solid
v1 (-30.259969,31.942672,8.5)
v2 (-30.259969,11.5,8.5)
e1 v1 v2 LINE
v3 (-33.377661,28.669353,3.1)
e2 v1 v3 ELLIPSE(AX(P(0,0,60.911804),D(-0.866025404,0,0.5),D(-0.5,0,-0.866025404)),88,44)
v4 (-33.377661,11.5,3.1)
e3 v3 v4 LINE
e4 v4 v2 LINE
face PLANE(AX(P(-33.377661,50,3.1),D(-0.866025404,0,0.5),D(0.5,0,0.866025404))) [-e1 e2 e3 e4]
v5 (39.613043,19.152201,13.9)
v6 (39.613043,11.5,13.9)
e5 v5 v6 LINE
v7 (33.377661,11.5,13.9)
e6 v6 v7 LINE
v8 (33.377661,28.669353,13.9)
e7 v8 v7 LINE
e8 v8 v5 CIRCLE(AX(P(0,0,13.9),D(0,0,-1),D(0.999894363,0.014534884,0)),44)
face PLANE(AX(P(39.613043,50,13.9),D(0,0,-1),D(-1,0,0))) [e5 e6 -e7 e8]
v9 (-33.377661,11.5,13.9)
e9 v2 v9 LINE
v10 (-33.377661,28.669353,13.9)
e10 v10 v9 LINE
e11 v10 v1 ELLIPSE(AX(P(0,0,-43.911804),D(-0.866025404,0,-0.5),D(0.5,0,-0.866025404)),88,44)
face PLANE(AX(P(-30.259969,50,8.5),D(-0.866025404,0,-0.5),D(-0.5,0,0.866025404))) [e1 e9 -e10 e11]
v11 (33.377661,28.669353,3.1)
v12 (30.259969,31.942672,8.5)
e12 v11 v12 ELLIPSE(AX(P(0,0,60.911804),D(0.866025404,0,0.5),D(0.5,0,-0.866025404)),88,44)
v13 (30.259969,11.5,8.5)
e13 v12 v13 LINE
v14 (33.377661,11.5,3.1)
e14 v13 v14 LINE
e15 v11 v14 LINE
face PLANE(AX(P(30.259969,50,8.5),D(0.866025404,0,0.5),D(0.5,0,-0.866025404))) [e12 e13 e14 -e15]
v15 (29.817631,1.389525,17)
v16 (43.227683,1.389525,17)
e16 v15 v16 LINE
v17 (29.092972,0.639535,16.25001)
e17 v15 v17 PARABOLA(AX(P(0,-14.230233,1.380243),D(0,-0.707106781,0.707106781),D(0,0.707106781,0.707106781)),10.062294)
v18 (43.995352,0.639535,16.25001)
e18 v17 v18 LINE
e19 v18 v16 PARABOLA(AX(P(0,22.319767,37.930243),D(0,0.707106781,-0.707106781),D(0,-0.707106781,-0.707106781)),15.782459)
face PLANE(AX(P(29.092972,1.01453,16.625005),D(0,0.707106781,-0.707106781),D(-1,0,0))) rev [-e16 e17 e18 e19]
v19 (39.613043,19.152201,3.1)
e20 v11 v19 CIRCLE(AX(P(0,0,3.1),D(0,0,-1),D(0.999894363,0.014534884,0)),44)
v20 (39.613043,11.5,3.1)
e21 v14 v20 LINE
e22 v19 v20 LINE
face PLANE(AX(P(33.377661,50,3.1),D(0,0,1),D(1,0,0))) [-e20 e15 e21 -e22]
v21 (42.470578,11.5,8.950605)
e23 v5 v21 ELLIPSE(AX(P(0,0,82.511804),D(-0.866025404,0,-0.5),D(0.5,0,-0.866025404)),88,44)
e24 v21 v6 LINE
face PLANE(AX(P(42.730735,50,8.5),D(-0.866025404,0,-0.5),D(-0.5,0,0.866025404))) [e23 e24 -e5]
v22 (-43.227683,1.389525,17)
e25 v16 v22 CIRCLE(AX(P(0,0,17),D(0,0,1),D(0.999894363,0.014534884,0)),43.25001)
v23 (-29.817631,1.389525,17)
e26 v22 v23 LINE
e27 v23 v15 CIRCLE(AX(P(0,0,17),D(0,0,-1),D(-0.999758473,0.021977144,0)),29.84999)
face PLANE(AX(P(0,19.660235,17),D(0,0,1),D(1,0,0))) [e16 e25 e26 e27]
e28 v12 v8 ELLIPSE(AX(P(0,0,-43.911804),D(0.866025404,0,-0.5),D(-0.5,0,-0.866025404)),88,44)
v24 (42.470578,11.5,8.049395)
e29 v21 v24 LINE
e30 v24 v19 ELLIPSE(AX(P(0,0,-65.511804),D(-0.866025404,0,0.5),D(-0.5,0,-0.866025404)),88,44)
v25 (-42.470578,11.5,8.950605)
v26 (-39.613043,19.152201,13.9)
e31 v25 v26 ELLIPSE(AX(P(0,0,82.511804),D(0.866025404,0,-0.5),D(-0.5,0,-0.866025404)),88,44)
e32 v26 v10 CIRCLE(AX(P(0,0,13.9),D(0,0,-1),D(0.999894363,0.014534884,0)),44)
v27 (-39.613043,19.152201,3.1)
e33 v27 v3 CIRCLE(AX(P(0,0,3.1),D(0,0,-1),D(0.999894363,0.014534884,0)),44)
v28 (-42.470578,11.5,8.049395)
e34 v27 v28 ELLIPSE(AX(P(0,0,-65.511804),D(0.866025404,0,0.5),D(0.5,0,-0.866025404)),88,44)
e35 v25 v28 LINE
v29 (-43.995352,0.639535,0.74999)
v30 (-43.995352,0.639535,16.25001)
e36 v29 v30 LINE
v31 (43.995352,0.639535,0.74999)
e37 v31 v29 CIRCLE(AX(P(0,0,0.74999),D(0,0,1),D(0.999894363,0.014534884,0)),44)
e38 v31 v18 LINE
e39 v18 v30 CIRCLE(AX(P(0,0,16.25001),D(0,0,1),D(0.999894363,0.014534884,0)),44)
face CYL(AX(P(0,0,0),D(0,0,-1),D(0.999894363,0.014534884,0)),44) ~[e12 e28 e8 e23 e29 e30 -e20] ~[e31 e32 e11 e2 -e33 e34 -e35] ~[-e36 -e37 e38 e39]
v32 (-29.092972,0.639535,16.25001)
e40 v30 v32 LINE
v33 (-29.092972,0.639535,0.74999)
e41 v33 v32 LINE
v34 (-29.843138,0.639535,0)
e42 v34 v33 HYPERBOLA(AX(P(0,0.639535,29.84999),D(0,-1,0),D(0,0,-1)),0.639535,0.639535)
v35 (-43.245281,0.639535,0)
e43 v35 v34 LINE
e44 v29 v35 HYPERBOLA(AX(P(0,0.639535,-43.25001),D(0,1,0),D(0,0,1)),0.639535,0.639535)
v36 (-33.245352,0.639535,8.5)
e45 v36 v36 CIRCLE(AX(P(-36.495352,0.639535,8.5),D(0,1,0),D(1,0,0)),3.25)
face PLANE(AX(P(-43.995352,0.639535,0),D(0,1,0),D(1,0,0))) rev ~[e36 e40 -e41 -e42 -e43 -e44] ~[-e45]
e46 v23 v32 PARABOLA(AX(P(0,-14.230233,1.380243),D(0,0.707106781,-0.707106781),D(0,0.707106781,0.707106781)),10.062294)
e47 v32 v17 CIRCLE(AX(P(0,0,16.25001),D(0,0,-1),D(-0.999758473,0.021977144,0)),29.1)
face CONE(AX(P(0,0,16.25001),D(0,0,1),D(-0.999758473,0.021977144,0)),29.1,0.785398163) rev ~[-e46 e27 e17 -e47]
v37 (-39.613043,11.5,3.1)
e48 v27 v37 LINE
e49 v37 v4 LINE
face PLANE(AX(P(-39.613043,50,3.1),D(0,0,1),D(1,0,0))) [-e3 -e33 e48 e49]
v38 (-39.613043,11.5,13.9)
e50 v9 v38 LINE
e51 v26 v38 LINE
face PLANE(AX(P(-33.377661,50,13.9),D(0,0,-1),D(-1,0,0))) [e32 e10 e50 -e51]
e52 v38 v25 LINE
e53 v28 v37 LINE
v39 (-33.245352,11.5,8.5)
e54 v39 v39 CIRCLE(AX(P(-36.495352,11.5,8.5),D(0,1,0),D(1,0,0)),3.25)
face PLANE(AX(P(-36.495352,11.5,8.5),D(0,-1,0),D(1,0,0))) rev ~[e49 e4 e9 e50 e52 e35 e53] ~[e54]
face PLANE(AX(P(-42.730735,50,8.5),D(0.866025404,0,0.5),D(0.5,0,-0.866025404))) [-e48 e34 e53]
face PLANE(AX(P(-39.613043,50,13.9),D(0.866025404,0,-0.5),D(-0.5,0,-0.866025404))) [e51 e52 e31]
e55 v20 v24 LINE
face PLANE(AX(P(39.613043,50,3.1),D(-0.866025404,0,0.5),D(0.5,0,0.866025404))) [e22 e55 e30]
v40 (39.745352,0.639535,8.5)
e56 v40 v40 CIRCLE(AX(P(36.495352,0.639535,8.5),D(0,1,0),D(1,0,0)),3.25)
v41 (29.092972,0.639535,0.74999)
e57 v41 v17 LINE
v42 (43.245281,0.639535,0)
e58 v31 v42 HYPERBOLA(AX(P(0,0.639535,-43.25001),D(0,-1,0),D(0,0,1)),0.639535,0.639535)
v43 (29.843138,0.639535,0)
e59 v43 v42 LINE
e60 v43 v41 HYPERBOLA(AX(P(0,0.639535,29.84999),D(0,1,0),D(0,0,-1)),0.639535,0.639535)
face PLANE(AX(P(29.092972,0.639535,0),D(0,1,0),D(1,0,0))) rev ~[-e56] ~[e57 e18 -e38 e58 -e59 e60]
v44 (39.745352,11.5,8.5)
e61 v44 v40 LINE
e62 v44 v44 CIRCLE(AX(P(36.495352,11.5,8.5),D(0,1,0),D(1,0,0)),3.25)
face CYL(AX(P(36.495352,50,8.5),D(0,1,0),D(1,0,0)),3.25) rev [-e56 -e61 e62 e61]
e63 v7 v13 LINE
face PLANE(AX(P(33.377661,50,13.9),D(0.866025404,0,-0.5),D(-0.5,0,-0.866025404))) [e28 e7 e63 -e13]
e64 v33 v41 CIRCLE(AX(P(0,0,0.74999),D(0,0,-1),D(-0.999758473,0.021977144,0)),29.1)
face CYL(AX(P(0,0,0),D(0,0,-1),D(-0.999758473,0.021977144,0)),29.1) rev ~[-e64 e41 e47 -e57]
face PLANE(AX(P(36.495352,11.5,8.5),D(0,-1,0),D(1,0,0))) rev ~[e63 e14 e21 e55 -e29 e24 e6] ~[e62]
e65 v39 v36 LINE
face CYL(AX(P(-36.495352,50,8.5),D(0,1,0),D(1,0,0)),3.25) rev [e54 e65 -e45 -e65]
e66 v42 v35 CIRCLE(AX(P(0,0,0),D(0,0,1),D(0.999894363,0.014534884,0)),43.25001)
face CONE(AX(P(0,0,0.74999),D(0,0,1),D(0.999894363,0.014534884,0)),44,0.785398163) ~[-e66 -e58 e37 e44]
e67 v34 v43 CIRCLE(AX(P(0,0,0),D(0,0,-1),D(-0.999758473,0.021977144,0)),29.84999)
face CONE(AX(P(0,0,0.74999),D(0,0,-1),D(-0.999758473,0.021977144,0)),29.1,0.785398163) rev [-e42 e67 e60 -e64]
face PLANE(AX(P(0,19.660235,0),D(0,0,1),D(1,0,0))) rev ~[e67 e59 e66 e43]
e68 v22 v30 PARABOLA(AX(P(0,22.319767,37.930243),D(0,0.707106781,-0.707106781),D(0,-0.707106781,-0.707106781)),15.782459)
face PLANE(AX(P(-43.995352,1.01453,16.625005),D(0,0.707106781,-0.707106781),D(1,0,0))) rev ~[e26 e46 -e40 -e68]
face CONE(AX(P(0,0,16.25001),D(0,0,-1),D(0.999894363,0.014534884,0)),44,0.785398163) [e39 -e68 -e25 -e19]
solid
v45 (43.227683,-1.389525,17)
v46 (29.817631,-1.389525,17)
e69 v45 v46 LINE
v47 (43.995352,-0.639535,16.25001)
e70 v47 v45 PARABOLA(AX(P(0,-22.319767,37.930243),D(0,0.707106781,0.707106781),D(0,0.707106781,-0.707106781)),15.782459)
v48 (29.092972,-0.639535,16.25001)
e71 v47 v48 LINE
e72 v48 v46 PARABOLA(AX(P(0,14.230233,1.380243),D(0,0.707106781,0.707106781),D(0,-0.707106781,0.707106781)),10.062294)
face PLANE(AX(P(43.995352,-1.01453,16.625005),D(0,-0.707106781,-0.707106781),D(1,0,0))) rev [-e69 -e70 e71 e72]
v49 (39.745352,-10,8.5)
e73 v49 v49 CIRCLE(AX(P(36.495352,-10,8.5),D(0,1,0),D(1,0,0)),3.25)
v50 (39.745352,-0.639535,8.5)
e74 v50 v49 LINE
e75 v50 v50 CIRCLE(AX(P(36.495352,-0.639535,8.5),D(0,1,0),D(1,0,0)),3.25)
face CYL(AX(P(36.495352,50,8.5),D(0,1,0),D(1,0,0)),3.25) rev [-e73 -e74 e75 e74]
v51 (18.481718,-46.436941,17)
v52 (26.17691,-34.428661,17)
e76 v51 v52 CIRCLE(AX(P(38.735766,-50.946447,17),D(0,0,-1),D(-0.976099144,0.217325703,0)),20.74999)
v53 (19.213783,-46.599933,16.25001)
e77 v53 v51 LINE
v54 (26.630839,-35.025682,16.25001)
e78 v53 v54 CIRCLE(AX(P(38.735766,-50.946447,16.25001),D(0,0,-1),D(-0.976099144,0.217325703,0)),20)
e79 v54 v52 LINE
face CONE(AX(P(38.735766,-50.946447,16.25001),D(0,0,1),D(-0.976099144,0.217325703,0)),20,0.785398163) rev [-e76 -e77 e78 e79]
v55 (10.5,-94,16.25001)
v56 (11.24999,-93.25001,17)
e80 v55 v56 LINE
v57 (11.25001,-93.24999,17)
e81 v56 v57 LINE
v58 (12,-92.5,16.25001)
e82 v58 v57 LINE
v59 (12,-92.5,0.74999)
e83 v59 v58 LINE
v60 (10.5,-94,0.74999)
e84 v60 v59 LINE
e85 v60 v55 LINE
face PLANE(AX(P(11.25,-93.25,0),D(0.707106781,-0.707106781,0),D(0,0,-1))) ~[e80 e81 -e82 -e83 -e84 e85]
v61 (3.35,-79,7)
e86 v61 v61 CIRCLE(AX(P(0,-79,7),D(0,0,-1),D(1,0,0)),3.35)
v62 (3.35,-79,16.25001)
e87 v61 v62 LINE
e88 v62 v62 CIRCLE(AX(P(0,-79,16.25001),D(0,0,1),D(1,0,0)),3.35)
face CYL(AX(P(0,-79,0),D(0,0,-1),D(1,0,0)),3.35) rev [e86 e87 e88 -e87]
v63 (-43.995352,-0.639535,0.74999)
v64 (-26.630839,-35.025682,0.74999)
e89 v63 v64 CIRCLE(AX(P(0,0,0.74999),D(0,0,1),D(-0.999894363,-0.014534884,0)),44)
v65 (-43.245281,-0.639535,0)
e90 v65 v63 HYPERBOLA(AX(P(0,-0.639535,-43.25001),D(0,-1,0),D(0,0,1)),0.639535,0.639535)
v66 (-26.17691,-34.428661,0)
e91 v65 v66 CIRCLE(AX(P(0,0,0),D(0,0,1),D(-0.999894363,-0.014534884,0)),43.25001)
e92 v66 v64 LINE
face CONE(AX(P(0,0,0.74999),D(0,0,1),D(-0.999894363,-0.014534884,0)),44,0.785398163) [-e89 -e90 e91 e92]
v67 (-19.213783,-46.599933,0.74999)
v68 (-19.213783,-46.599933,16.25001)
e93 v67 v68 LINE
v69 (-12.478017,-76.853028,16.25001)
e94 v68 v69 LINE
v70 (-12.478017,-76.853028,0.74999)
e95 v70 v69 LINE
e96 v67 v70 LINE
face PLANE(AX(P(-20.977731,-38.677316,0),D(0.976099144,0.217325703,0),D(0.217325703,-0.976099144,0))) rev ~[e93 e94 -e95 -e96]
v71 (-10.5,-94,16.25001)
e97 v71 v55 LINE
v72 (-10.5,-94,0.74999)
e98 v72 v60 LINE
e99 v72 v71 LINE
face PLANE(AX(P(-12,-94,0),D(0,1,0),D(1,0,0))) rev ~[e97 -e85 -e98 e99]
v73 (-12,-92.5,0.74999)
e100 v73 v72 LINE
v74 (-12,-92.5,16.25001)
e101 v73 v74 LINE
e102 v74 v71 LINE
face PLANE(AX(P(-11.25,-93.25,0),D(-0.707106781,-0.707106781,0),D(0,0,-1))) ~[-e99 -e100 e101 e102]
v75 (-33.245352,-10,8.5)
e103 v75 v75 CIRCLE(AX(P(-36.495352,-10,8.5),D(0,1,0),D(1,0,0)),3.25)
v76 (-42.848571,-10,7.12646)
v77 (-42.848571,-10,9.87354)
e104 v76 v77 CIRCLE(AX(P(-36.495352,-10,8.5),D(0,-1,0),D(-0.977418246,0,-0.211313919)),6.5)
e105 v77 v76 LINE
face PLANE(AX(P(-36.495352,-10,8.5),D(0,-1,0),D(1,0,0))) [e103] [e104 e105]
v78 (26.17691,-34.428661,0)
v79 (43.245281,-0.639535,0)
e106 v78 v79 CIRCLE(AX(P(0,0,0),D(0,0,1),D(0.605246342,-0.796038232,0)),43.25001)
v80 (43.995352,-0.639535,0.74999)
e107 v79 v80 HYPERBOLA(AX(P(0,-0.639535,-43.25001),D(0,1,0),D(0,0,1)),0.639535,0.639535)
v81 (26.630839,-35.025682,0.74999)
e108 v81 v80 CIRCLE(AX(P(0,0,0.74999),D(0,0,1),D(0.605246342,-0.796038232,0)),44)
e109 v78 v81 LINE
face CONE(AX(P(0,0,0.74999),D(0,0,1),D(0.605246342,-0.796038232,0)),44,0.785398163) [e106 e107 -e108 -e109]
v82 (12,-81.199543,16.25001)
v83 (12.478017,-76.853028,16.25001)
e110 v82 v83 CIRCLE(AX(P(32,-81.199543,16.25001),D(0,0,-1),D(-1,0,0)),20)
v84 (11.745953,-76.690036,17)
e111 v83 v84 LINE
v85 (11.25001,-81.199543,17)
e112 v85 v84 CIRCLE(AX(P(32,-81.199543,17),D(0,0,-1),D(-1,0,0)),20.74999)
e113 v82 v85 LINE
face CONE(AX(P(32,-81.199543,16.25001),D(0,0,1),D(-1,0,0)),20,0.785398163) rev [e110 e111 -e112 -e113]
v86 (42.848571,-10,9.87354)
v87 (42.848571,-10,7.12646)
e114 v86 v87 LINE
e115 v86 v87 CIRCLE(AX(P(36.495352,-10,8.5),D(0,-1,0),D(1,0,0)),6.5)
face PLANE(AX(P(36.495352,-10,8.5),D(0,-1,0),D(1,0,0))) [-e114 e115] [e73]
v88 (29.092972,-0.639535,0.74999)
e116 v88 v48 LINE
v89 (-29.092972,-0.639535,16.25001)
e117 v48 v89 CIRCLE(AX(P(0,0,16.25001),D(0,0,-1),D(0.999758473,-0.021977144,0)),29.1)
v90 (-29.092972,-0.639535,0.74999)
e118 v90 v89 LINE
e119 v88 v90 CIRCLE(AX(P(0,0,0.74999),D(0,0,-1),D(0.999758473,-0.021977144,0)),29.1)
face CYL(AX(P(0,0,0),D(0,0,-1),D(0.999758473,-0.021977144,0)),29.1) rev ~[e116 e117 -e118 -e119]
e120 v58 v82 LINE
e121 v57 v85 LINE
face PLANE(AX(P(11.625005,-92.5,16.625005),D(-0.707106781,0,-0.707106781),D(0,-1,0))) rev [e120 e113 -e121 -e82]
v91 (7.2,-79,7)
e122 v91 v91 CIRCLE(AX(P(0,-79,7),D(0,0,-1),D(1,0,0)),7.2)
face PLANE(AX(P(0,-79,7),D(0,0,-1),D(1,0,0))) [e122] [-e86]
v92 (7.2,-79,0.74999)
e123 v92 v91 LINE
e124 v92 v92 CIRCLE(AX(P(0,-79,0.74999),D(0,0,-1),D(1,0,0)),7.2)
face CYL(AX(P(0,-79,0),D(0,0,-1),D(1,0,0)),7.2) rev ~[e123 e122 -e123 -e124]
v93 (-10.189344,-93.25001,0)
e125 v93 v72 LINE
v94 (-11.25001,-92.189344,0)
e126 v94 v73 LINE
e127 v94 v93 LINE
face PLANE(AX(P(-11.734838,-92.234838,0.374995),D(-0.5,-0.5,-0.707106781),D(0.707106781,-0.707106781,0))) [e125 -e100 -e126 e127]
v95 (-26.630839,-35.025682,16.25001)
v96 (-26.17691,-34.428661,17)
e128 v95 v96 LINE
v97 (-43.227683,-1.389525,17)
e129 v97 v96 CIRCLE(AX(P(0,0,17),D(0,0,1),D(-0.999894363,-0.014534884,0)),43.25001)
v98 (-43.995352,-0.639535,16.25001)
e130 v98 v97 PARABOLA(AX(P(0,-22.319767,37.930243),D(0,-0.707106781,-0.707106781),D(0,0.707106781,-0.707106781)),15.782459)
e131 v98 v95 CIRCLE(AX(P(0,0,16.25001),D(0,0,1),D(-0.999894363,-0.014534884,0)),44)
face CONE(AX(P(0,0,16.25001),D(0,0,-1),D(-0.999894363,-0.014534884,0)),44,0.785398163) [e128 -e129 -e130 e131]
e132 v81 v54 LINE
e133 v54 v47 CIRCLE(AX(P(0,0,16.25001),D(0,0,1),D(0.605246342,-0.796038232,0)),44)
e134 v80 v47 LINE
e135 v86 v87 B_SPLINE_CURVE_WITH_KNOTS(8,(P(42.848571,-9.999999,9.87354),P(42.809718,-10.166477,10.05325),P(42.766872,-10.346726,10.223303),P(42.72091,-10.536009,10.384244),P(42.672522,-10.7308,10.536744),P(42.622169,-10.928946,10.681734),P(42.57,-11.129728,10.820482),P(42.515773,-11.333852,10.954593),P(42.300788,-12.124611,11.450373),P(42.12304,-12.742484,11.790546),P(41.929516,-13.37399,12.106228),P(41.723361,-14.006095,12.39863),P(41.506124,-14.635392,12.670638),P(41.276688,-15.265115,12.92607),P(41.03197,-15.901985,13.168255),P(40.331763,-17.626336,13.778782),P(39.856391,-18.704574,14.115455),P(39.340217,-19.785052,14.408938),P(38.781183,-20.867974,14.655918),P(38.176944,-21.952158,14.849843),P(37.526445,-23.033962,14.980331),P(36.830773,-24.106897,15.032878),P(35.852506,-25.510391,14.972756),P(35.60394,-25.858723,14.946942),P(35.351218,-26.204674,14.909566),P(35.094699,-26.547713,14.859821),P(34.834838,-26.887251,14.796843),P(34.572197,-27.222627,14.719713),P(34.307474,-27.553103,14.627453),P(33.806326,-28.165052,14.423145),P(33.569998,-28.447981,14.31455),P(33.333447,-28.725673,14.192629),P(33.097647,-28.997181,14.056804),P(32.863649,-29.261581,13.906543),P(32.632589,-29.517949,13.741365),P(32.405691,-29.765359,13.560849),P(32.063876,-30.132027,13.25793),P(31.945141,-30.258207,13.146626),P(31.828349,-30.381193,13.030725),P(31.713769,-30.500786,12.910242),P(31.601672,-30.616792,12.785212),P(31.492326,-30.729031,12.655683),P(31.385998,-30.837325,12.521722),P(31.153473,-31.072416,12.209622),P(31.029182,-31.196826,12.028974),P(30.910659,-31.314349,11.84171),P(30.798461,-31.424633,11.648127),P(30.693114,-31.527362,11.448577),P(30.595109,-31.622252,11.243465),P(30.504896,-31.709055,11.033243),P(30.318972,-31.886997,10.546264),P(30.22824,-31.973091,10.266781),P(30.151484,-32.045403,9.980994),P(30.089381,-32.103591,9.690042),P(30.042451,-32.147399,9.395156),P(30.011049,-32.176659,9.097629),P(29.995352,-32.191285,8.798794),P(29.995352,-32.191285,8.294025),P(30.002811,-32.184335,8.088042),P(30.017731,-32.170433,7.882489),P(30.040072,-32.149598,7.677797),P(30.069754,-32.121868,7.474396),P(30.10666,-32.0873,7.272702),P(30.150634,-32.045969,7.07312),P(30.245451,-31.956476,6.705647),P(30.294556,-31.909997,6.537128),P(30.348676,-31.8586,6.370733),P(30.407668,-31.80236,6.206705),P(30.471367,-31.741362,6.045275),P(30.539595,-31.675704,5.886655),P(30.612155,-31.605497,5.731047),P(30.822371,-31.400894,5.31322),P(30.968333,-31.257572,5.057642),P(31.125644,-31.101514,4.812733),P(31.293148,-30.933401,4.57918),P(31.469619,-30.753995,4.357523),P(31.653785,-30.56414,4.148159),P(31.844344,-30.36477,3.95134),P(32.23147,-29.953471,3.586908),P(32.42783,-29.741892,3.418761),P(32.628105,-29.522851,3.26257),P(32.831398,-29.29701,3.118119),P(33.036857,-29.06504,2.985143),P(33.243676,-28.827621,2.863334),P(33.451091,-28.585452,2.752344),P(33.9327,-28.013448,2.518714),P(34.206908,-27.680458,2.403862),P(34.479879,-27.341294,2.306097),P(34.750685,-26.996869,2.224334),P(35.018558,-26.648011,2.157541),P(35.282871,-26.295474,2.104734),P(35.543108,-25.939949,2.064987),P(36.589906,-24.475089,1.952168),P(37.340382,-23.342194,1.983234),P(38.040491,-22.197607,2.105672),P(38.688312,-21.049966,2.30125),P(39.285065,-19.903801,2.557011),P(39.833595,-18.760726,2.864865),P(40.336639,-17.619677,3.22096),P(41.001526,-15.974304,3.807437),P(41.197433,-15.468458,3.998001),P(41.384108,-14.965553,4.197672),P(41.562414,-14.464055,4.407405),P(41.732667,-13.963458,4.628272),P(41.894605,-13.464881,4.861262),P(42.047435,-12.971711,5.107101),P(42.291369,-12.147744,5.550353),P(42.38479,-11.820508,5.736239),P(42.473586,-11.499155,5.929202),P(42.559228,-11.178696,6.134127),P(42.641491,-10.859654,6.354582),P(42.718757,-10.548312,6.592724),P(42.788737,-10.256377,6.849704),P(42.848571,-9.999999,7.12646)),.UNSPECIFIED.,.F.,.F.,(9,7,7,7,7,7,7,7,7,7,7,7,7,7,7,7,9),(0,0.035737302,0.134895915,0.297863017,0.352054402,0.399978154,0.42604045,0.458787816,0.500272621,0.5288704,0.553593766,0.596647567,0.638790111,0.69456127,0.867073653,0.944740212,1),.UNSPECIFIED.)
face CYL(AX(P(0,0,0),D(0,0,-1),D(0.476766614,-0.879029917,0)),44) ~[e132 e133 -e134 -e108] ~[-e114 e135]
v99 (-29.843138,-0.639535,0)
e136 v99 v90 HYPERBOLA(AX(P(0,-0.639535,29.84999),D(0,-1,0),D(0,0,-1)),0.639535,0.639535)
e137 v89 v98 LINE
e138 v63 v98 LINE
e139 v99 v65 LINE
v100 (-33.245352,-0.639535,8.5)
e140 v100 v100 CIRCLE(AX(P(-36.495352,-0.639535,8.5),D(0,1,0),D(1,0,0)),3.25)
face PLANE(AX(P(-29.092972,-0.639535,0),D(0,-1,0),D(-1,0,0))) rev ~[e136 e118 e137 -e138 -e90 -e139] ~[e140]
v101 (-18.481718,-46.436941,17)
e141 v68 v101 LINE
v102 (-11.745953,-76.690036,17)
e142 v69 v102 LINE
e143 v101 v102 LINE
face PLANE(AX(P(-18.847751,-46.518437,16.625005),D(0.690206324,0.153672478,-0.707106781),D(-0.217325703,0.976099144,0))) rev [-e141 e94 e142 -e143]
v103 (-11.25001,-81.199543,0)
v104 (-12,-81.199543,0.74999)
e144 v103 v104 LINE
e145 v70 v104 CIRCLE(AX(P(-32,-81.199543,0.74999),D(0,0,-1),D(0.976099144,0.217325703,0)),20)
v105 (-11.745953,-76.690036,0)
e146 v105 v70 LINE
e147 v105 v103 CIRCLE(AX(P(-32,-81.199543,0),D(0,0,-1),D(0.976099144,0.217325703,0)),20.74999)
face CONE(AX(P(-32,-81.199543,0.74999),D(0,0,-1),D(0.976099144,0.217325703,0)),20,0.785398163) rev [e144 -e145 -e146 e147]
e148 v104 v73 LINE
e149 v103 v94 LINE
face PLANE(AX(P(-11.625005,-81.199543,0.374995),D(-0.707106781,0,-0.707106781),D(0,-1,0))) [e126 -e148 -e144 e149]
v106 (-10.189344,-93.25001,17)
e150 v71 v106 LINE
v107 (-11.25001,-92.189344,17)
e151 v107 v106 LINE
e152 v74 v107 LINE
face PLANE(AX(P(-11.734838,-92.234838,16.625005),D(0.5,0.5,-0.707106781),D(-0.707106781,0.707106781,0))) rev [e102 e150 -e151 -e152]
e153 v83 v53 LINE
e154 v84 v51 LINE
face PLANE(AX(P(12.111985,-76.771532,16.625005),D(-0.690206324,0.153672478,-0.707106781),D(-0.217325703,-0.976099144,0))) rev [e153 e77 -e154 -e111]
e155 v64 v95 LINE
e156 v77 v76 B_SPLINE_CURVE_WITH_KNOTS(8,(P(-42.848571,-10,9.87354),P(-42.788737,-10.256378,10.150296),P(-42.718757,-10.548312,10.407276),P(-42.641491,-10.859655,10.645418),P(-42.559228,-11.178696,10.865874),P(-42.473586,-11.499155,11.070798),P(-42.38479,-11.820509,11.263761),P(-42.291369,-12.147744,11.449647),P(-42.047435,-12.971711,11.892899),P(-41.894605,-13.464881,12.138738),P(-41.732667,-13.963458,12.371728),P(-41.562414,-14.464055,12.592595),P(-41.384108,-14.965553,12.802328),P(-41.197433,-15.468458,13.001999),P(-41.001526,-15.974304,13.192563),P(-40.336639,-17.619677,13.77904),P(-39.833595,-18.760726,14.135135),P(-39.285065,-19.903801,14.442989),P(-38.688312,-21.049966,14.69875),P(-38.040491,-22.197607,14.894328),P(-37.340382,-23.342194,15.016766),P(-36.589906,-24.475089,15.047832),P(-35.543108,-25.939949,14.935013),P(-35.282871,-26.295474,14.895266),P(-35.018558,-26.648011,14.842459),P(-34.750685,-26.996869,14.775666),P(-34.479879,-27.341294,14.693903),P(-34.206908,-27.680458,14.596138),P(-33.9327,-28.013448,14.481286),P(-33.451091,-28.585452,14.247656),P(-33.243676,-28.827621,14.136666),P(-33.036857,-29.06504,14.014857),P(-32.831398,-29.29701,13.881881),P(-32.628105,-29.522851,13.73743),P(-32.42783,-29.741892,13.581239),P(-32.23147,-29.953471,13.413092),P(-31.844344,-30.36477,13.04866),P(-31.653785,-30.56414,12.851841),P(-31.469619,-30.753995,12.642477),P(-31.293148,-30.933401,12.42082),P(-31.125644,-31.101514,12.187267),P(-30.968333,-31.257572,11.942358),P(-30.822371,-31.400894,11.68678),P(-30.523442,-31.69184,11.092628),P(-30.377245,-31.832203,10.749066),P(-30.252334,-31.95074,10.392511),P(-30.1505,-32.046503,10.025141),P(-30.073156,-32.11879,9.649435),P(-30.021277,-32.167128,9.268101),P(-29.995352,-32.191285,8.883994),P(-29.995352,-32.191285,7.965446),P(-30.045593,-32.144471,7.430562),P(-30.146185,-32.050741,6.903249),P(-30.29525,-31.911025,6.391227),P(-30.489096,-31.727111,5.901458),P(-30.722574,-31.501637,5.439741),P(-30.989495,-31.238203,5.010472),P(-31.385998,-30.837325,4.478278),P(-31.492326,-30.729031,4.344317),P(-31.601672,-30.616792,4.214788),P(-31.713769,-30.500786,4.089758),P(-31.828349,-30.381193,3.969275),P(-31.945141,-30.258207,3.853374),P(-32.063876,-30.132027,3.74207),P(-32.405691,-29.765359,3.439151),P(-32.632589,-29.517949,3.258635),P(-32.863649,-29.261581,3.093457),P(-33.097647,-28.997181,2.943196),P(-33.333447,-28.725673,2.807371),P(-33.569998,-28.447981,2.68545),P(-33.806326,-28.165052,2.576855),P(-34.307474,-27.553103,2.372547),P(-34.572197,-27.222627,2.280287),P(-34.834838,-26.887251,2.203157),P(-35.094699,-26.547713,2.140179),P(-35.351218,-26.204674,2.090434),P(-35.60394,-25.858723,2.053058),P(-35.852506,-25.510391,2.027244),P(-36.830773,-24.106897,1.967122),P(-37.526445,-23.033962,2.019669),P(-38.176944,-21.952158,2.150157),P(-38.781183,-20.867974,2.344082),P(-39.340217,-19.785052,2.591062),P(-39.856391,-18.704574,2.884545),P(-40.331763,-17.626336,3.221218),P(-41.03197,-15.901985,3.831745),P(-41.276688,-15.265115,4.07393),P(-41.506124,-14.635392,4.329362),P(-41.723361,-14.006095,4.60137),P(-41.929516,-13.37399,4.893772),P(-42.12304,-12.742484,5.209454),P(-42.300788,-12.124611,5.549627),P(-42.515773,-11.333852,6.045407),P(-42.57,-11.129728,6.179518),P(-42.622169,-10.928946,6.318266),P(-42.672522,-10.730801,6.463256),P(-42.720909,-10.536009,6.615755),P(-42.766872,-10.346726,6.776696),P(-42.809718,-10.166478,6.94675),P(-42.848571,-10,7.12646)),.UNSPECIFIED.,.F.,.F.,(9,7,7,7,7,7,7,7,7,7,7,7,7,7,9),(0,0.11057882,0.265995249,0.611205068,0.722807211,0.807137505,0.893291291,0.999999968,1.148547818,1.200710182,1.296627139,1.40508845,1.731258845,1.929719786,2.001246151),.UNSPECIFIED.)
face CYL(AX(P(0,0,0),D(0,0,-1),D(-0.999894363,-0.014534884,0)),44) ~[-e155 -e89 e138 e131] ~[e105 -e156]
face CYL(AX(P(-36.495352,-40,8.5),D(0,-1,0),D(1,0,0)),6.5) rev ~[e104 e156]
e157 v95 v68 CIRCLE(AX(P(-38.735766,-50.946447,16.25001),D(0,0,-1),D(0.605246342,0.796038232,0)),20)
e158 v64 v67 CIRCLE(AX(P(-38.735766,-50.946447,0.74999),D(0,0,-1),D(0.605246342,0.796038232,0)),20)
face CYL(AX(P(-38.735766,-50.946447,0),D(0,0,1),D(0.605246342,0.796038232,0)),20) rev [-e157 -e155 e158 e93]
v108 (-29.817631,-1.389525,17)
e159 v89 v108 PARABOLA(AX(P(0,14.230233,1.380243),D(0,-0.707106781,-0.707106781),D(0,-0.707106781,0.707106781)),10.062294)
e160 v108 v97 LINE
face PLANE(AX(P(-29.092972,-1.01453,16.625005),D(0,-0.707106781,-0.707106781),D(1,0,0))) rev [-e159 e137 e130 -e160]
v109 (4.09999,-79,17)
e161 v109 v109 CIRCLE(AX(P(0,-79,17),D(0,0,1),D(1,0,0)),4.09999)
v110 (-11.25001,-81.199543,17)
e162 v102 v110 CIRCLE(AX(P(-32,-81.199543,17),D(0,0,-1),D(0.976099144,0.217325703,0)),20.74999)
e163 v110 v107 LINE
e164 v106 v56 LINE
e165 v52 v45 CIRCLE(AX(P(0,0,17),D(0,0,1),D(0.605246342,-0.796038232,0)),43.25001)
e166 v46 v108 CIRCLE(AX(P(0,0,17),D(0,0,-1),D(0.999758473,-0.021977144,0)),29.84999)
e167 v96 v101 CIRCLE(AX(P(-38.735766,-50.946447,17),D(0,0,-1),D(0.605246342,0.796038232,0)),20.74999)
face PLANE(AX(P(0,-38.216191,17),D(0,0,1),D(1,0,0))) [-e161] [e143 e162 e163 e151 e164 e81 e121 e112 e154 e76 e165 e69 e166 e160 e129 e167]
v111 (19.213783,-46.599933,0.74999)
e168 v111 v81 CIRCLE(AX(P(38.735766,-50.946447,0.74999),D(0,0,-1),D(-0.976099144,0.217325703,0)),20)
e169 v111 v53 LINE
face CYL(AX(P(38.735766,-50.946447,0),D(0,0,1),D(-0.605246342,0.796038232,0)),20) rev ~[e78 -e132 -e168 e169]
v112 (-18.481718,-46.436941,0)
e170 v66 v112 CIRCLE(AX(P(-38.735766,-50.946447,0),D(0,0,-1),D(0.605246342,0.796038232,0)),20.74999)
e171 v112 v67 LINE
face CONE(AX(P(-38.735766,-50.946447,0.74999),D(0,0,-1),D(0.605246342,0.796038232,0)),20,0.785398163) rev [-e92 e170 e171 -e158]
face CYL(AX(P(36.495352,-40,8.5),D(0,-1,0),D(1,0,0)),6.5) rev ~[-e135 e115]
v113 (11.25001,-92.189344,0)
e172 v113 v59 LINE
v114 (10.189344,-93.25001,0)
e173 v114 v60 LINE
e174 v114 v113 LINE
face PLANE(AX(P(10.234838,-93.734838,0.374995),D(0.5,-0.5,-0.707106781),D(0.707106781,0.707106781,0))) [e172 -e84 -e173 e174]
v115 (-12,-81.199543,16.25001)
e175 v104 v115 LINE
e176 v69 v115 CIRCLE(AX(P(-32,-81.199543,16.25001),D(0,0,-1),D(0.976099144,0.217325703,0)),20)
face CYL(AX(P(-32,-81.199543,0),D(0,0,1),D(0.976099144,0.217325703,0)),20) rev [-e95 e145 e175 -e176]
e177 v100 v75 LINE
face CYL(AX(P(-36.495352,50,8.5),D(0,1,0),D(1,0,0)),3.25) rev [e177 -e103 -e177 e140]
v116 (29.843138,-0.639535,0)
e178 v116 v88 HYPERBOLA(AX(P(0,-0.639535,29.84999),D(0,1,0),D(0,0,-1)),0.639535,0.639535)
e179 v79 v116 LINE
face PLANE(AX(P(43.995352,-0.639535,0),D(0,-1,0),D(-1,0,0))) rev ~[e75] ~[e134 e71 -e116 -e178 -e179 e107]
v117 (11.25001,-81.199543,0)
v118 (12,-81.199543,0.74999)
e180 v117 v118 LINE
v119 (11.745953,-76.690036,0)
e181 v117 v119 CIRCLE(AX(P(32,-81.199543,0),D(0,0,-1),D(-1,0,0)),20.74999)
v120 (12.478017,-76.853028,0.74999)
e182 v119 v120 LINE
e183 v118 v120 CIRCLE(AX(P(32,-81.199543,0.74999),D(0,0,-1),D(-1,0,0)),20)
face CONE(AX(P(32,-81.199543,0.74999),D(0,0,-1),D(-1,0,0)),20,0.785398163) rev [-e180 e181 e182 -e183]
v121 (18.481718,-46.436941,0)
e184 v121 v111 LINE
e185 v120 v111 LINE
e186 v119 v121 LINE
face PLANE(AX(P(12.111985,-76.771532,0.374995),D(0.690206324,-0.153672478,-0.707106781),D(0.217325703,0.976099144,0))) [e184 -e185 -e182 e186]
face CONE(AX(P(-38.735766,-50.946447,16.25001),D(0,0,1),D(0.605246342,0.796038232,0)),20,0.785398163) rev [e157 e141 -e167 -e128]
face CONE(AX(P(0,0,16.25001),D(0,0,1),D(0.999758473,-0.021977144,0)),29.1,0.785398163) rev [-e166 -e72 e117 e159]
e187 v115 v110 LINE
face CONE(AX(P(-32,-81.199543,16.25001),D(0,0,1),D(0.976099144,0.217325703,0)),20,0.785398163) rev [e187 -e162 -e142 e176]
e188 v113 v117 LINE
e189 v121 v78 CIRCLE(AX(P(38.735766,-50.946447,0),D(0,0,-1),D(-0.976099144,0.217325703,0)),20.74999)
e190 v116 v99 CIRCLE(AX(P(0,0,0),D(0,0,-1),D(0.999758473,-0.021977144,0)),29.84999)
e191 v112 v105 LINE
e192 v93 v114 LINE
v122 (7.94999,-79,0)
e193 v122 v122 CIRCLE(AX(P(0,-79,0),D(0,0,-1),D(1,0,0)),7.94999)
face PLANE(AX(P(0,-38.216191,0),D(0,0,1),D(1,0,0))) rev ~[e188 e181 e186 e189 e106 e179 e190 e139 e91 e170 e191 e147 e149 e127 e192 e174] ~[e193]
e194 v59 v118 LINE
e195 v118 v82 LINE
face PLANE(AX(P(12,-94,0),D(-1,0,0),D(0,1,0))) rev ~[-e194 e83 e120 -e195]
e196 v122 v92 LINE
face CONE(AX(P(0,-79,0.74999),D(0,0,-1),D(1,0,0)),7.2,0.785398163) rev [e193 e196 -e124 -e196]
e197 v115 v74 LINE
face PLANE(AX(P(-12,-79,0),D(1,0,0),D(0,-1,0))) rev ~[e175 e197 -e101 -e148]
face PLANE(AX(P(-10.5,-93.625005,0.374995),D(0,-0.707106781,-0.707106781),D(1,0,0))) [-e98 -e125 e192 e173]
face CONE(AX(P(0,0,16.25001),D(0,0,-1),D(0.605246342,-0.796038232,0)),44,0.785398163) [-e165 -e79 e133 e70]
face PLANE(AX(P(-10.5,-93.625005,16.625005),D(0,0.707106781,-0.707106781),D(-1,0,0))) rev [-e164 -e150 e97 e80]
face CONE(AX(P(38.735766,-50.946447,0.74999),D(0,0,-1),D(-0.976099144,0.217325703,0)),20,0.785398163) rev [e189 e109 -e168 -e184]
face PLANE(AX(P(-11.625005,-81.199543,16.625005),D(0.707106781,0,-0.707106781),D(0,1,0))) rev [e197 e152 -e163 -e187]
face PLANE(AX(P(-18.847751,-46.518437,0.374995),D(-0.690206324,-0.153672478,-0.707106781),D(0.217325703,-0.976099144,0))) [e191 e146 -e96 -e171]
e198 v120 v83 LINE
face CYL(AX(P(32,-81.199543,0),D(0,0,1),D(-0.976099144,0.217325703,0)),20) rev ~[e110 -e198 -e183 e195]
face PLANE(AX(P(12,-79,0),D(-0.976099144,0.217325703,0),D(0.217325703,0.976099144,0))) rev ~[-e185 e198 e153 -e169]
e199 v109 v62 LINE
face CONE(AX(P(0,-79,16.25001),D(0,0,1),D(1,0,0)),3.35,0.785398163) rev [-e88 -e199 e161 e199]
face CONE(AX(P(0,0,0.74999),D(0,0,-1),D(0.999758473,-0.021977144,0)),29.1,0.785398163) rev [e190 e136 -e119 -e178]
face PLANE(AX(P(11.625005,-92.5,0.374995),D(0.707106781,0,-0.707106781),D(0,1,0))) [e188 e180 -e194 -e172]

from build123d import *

# Parameters (mm, degrees)
F0_R       = 3.35
F1_DEPTH   = 17
F2_R       = 7.2
F3_DEPTH   = 7
F4_R       = 20
F6_R       = 3.25
F7_DEPTH   = 100
F9_DEPTH   = 38.5
F11_R      = 6.5
F12_DEPTH  = 30
F13_SIZE   = 1.5
F14_SIZE   = 0.74999
F14_2_SIZE = 0.74999


# Not quite as in the source:
# - a fillet or chamfer is up to 0.001 mm smaller than in the source, because OpenCascade refuses the exact size


with BuildPart() as f1:
    # F0 (on Top) → F1 (new body)
    with BuildSketch(Plane.XY):
        with BuildLine():
            ThreePointArc((29.0929715762, -0.6395348837), (0, -29.1), (-29.0929715762, -0.6395348837))
            Line((-29.0929715762, -0.6395348837), (-43.9953519719, -0.6395348837))
            ThreePointArc((-43.9953519719, -0.6395348837), (-37.6443034661, -22.7795174785), (-20.9777310227, -38.6773163643))
            Line((-20.9777310227, -38.6773163643), (-12, -79))
            Line((-12, -79), (-12, -94))
            Line((-12, -94), (12, -94))
            Line((12, -94), (12, -79))
            Line((12, -79), (20.9777310227, -38.6773163643))
            ThreePointArc((20.9777310227, -38.6773163643), (37.6443034661, -22.7795174785), (43.9953519719, -0.6395348837))
            Line((43.9953519719, -0.6395348837), (29.0929715762, -0.6395348837))
        make_face()
        with Locations((0, -79)):
            Circle(F0_R, mode=Mode.SUBTRACT)
    extrude(amount=F1_DEPTH)

    # F2 (on face) → F3 (cut)
    with BuildSketch(Plane(origin=(0, 0, 0), x_dir=(1, 0, 0), z_dir=(0, 0, -1))):
        with Locations((0, 79)):
            Circle(F2_R)
    extrude(amount=-F3_DEPTH, mode=Mode.SUBTRACT)

    # F4
    f4_edges = [f1.edges().sort_by_distance(p)[0] for p in [
        (-20.977731, -38.677316, 8.5),
        (-12, -79, 8.5),
        (20.977731, -38.677316, 8.5),
        (12, -79, 8.5),
    ]]
    fillet(f4_edges, radius=F4_R)


with BuildPart() as f1b:
    # F0 (on Top) → F1, piece 2 (new body)
    with BuildSketch(Plane.XY):
        with BuildLine():
            ThreePointArc((43.9953519719, 0.6395348837), (0, 44), (-43.9953519719, 0.6395348837))
            Line((-43.9953519719, 0.6395348837), (-29.0929715762, 0.6395348837))
            ThreePointArc((-29.0929715762, 0.6395348837), (0, 29.1), (29.0929715762, 0.6395348837))
            Line((29.0929715762, 0.6395348837), (43.9953519719, 0.6395348837))
        make_face()
    extrude(amount=F1_DEPTH)


with BuildPart() as f7_tool:
    # F6 (on offset) → F7 (new body)
    with BuildSketch(Plane.XZ.offset(-50)):
        with Locations((36.4953519719, 8.5)):
            Circle(F6_R)
        with Locations((-36.4953519719, 8.5)):
            Circle(F6_R)
    extrude(amount=F7_DEPTH)


with BuildPart() as f1_1:
    add(f1.part)

    # F7: cut by f7_tool
    add(f7_tool.part, mode=Mode.SUBTRACT)

    # F11 (on offset) → F12 (cut)
    with BuildSketch(Plane.XZ.offset(40)):
        with Locations((-36.4953519719, 8.5)):
            Circle(F11_R)
        with Locations((36.4953519719, 8.5)):
            Circle(F11_R)
    extrude(amount=-F12_DEPTH, mode=Mode.SUBTRACT)

    # F13
    f13_edges = [f1_1.edges().sort_by_distance(p)[0] for p in [
        (-12, -94, 8.5),
        (12, -94, 8.5),
    ]]
    chamfer(f13_edges, length=F13_SIZE)

    # F14 (size 0.75 in the source; OpenCascade refuses exactly that, so slightly less here)
    f14_edges = [f1_1.edges().sort_by_distance(p)[0] for p in [
        (-3.35, -79, 17),
        (0, -29.1, 17),
        (36.544162, -0.639535, 17),
        (-36.544162, -0.639535, 17),
        (-7.2, -79, 0),
        (0, -29.1, 0),
        (39.276157, -19.833898, 0),
        (21.89664, -40.155533, 0),
        (15.8459, -61.726481, 0),
        (12, -86.849771, 0),
        (12.119863, -79.013182, 0),
        (11.25, -93.25, 0),
        (0, -94, 0),
        (-11.25, -93.25, 0),
        (-12, -86.849771, 0),
        (-12.119863, -79.013182, 0),
        (-15.8459, -61.726481, 0),
        (-21.89664, -40.155533, 0),
        (-39.276157, -19.833898, 0),
        (15.8459, -61.726481, 17),
        (21.89664, -40.155533, 17),
        (39.276157, -19.833898, 17),
        (-15.8459, -61.726481, 17),
        (-12, -86.849771, 17),
        (-12.119863, -79.013182, 17),
        (-11.25, -93.25, 17),
        (0, -94, 17),
        (12, -86.849771, 17),
        (-39.276157, -19.833898, 17),
        (-21.89664, -40.155533, 17),
    ]]
    chamfer(f14_edges, length=F14_SIZE)


with BuildPart() as f1b_1:
    add(f1b.part)

    # F7: cut by f7_tool
    add(f7_tool.part, mode=Mode.SUBTRACT)

    # F8 (on offset) → F9 (cut)
    with BuildSketch(Plane.XZ.offset(-50)):
        Polygon((30.2599690647, 8.5), (33.3776605183, 3.1), (39.6130434255, 3.1), (42.7307348792, 8.5), (39.6130434255, 13.9), (33.3776605183, 13.9), align=None)
        Polygon((-42.7307348792, 8.5), (-39.6130434255, 3.1), (-33.3776605183, 3.1), (-30.2599690647, 8.5), (-33.3776605183, 13.9), (-39.6130434255, 13.9), align=None)
    extrude(amount=F9_DEPTH, mode=Mode.SUBTRACT)

    # F14#2 (size 0.75 in the source; OpenCascade refuses exactly that, so slightly less here)
    f14_2_edges = [f1b_1.edges().sort_by_distance(p)[0] for p in [
        (0, 29.1, 17),
        (36.544162, 0.639535, 17),
        (-36.544162, 0.639535, 17),
        (0, 29.1, 0),
        (0, 44, 0),
        (0, 44, 17),
    ]]
    chamfer(f14_2_edges, length=F14_2_SIZE)


solid = Compound([f1_1.part, f1b_1.part])
